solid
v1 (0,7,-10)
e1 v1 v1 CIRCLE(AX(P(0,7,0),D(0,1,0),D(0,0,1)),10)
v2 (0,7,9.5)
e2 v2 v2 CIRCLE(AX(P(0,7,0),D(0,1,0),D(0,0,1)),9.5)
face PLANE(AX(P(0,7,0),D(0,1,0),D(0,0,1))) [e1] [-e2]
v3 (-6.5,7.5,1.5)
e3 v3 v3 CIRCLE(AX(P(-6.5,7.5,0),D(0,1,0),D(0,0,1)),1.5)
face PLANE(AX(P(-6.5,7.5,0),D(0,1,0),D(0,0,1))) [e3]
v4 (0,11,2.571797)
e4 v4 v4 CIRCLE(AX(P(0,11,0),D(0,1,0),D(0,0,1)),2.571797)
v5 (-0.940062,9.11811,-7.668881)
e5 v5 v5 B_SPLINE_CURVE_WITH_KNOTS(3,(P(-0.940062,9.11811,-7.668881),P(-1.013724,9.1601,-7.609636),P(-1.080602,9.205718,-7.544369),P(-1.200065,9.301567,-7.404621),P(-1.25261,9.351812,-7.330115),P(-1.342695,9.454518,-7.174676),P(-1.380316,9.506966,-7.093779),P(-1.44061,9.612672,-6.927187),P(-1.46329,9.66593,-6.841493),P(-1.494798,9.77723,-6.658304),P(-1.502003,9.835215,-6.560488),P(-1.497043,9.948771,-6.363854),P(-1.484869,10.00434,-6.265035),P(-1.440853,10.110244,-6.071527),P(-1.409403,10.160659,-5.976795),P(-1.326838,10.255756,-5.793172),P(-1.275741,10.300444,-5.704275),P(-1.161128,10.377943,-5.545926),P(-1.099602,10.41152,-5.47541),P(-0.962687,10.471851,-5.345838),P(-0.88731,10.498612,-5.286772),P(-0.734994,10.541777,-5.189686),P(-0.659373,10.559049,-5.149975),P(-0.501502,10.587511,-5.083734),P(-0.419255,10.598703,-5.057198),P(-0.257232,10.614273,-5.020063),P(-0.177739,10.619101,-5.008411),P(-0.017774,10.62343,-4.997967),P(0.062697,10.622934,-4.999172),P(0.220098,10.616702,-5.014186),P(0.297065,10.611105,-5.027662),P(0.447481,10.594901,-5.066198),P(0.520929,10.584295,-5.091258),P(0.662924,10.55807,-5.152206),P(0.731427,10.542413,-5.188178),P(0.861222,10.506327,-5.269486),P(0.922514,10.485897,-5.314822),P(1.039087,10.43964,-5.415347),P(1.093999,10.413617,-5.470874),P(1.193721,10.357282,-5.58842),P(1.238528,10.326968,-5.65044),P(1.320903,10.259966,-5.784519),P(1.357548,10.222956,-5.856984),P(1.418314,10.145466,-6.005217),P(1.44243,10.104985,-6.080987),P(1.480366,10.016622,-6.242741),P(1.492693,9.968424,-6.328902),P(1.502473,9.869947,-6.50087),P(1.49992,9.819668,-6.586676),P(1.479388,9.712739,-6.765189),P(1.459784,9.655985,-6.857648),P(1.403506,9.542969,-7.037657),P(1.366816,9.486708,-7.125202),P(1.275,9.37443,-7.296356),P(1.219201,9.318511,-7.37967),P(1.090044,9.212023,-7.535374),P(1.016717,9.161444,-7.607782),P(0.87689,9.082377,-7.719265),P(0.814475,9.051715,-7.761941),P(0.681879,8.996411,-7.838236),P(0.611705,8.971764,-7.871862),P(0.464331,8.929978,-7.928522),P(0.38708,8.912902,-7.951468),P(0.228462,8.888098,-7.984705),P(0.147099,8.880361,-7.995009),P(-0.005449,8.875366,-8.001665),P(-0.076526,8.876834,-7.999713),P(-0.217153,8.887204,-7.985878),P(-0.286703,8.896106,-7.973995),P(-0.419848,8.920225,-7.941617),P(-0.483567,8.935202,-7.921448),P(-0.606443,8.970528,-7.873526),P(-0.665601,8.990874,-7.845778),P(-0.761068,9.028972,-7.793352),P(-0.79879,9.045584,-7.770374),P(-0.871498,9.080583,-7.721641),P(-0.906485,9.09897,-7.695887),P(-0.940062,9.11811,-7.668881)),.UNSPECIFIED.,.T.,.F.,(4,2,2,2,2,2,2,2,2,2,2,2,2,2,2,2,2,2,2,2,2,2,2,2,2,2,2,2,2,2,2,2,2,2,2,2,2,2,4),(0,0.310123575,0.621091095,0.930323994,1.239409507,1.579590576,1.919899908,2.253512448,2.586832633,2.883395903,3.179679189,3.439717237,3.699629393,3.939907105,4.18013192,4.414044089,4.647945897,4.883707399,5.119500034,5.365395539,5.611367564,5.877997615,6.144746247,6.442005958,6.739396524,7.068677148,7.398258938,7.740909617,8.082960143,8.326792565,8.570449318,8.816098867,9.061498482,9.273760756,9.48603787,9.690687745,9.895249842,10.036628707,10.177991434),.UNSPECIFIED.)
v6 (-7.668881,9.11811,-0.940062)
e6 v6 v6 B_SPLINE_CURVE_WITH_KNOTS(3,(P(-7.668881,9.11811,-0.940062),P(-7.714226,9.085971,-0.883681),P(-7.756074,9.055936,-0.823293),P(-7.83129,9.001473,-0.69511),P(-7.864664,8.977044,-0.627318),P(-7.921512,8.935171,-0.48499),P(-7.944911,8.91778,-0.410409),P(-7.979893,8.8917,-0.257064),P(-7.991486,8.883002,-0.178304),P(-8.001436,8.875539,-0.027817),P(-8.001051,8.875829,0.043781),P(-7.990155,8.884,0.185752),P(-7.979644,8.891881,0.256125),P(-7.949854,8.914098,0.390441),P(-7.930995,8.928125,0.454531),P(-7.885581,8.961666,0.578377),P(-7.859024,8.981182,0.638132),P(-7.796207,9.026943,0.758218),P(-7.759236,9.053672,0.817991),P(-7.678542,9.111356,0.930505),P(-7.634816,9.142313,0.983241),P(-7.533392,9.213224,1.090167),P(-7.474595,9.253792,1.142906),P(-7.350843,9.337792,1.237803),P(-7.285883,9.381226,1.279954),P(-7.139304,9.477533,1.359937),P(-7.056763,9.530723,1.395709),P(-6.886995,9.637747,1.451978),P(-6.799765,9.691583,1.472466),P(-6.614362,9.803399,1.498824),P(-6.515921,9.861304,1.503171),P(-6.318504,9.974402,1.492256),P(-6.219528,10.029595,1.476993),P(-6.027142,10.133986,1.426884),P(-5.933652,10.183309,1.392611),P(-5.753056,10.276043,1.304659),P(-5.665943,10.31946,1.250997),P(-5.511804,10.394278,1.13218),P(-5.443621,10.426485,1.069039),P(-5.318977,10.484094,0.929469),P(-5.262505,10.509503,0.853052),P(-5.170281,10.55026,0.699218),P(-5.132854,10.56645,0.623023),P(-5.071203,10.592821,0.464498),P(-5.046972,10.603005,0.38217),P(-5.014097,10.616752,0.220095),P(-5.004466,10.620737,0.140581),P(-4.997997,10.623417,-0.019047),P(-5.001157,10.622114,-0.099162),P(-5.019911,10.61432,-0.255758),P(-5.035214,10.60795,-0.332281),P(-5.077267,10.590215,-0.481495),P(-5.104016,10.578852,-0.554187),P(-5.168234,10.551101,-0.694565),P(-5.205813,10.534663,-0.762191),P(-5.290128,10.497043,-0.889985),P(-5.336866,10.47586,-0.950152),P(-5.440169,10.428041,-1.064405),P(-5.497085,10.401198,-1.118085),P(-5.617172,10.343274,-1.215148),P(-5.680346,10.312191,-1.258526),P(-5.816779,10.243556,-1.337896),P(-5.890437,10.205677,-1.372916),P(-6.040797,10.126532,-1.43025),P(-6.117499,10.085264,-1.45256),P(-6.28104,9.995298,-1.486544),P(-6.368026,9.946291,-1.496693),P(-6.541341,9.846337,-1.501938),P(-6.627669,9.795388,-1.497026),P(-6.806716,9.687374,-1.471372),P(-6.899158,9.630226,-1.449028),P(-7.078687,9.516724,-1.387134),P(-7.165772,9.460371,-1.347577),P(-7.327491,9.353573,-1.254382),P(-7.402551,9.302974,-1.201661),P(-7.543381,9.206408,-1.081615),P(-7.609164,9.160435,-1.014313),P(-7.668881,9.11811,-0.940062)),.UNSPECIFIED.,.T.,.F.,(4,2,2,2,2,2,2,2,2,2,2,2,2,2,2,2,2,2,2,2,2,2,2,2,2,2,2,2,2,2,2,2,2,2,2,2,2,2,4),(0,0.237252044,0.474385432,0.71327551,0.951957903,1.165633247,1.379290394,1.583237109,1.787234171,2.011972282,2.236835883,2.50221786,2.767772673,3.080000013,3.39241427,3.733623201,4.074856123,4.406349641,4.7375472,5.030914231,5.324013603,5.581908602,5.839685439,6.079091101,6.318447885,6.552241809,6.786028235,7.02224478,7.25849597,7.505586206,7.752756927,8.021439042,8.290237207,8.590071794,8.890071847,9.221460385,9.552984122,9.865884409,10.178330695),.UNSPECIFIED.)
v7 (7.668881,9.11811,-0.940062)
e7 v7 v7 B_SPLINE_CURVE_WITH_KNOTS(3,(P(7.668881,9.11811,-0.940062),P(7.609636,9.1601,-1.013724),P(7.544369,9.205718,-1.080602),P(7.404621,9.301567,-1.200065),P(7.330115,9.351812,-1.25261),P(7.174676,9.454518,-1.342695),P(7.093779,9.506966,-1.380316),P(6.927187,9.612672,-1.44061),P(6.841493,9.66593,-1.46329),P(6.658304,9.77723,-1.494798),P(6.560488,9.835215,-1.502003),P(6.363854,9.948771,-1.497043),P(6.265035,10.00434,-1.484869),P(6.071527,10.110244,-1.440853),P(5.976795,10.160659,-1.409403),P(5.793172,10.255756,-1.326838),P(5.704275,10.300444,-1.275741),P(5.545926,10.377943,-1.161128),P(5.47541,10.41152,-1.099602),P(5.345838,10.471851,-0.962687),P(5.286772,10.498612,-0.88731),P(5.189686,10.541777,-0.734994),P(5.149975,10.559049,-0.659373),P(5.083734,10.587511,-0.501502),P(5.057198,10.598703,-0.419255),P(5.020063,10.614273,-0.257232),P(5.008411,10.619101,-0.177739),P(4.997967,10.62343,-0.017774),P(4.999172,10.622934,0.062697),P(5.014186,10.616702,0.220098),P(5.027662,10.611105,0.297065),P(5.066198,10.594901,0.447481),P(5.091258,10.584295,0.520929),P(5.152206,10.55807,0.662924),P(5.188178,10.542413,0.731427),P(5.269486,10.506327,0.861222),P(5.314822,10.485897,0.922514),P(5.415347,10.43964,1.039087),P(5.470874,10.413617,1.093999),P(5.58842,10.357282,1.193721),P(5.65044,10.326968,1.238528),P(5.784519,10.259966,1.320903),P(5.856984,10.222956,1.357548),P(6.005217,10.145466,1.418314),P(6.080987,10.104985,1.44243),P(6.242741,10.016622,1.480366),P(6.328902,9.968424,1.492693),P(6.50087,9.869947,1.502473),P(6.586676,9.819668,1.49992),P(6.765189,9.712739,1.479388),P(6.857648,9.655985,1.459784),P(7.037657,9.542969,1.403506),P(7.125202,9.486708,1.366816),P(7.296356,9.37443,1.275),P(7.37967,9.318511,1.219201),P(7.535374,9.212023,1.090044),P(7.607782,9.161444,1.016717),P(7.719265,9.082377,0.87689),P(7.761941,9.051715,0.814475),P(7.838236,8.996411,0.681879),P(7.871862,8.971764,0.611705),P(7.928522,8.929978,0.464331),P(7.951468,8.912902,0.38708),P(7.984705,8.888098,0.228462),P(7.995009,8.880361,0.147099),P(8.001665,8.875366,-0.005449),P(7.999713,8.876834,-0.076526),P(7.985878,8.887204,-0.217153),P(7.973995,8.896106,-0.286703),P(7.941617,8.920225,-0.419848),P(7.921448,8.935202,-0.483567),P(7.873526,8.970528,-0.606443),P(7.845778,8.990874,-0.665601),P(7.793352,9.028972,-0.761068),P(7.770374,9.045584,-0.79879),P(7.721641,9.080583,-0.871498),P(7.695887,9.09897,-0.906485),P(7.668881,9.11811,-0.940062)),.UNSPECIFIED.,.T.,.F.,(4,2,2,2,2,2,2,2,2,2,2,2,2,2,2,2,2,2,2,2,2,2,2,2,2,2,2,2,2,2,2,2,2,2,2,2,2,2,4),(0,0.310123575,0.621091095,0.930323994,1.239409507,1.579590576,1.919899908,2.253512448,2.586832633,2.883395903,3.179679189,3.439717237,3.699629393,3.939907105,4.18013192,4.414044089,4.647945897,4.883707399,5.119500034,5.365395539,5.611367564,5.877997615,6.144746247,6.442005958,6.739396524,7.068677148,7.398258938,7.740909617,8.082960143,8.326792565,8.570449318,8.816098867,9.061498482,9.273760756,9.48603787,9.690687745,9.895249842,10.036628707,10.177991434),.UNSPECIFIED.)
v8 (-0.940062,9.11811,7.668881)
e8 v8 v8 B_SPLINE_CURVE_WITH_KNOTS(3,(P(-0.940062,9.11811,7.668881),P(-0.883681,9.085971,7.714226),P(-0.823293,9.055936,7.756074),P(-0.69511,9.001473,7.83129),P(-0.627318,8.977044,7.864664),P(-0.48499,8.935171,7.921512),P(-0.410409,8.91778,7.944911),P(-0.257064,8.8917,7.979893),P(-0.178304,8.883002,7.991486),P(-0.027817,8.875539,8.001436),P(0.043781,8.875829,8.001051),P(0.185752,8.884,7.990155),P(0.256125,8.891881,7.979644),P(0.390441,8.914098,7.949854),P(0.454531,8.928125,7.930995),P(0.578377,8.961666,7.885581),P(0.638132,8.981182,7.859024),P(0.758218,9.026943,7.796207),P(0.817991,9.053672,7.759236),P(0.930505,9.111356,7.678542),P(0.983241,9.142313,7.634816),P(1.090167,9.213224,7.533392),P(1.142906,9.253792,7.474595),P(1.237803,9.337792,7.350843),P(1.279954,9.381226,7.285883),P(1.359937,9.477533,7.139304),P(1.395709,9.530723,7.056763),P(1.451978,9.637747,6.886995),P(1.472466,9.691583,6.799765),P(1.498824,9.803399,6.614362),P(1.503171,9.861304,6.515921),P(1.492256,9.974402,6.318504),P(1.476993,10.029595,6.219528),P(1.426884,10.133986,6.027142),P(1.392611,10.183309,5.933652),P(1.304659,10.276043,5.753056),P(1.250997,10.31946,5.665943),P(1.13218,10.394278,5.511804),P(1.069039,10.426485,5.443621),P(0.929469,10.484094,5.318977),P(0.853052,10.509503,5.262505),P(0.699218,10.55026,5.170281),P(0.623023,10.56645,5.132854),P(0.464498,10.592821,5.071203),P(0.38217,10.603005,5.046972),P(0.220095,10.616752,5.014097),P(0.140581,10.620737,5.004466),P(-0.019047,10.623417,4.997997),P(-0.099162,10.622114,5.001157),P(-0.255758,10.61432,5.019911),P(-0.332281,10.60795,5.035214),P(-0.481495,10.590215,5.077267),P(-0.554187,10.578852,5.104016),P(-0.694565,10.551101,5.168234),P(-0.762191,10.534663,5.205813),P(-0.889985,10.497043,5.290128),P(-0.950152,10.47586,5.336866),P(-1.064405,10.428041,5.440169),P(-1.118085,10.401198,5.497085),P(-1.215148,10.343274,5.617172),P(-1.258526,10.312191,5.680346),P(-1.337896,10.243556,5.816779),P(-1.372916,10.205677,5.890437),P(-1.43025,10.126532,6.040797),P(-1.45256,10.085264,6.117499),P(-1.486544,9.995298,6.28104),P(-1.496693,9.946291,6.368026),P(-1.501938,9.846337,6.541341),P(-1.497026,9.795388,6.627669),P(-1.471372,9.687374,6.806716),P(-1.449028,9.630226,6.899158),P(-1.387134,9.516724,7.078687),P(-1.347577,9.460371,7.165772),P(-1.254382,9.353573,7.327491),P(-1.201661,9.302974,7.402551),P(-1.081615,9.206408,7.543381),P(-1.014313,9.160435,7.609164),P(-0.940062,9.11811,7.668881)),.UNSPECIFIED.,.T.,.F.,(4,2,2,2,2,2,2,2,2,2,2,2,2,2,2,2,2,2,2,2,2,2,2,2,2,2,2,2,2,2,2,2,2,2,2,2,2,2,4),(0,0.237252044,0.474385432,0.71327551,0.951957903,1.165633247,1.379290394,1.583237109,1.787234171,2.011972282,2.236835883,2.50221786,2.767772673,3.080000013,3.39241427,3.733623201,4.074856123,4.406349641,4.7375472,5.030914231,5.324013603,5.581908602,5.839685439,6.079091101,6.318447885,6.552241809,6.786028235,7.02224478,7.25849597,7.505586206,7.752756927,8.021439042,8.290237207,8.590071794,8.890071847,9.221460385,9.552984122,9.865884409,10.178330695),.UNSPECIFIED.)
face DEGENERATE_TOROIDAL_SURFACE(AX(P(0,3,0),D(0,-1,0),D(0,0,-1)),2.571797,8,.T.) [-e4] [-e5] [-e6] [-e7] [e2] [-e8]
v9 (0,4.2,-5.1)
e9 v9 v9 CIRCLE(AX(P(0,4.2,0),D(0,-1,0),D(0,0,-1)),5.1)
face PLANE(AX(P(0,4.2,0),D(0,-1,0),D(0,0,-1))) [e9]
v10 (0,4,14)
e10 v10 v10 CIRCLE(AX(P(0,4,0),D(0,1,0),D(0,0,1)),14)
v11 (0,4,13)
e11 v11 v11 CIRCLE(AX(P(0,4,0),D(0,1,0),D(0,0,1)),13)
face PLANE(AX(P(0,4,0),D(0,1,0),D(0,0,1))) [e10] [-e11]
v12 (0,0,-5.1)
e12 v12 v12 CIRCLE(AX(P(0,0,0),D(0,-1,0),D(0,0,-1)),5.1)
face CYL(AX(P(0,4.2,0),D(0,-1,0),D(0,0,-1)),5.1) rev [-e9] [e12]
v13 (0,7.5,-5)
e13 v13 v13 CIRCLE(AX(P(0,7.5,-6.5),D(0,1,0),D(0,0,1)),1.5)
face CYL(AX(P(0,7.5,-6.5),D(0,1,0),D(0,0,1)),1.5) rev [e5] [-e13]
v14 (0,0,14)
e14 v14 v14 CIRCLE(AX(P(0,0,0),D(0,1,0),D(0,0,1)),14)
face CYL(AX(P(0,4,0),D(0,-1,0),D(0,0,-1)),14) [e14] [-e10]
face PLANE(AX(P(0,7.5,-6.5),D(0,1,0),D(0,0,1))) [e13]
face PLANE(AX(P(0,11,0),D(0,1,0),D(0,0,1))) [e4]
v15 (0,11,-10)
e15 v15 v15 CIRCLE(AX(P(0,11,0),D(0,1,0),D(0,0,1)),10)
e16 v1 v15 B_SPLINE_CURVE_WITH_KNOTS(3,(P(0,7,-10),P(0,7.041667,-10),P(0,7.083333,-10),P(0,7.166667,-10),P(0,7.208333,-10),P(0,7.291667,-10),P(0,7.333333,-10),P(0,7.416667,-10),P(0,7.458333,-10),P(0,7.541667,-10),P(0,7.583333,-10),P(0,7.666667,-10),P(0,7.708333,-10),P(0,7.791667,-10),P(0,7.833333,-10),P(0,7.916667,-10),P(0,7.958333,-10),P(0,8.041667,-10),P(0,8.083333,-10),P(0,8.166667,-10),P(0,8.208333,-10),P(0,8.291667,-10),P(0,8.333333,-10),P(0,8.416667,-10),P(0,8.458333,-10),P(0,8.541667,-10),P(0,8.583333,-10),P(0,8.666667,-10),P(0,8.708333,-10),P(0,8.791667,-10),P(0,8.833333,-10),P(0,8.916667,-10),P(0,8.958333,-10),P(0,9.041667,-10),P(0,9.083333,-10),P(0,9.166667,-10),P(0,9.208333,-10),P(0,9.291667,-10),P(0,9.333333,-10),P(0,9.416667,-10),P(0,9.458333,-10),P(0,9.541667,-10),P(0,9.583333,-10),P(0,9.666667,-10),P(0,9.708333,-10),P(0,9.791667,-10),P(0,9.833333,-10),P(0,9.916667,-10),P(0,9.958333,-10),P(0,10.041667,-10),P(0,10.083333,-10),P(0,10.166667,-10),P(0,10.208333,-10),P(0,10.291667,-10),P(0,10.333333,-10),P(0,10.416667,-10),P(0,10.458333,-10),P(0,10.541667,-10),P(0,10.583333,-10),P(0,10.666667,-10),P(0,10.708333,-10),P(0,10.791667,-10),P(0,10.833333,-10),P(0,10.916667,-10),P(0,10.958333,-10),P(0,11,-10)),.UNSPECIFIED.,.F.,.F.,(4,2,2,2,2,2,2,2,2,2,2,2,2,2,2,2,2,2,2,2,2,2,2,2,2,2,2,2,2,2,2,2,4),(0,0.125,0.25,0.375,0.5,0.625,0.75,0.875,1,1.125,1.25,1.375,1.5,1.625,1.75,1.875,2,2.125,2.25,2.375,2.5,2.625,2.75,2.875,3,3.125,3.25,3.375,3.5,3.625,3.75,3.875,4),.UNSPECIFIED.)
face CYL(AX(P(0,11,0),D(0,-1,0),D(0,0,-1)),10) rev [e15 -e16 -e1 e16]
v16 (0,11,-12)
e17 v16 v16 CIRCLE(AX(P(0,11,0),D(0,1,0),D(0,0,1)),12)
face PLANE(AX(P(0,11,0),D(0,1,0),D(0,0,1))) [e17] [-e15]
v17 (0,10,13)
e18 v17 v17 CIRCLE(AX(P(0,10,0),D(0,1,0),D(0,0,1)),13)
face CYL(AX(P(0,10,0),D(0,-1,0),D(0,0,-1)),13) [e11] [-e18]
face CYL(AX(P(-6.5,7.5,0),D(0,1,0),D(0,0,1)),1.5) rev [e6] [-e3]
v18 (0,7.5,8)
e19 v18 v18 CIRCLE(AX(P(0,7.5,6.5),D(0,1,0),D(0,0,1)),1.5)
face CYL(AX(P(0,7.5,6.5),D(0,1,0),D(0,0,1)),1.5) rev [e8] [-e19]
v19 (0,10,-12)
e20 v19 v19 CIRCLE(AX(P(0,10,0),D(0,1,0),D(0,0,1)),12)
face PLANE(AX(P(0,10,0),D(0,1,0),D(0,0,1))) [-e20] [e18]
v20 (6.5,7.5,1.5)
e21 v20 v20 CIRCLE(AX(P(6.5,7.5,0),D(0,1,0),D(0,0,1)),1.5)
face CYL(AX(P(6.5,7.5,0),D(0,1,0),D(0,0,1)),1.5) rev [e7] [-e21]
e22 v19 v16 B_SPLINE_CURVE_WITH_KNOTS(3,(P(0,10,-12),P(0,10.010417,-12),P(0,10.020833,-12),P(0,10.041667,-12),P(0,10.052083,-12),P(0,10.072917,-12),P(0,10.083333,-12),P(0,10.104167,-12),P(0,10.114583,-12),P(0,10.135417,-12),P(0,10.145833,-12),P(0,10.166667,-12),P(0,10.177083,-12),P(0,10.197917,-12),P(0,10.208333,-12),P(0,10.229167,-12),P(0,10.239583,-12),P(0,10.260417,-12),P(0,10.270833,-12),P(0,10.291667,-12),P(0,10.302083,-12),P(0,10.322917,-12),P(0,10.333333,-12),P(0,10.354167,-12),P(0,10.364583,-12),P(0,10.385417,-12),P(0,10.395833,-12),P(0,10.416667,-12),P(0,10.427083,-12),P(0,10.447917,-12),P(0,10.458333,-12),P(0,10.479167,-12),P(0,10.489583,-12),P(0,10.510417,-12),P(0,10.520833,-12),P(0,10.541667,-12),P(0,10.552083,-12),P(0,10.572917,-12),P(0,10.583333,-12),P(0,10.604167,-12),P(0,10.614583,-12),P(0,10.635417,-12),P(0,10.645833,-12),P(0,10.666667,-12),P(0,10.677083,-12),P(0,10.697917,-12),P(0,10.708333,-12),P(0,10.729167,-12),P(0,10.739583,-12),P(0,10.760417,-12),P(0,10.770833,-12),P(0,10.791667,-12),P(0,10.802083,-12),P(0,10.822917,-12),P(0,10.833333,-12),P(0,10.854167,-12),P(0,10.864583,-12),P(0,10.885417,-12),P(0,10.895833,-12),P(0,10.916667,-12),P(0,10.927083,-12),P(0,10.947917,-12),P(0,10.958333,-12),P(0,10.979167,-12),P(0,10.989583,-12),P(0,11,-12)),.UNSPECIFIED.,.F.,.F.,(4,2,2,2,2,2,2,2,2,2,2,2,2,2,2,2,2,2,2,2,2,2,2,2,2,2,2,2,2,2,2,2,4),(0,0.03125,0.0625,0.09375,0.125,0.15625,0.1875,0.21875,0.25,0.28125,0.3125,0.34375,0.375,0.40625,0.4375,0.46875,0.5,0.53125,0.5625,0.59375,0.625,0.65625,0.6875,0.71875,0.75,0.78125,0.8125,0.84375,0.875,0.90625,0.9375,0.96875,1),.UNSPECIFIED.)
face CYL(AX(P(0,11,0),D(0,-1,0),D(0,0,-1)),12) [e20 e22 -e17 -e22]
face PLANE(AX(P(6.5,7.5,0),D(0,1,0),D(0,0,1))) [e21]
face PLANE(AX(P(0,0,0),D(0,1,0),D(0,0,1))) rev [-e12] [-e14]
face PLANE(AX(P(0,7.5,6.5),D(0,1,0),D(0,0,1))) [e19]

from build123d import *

# Parameters (mm, degrees)
SKETCH1_R           = 14
BOSS_EXTRUDE1_DEPTH = 4
SKETCH2_R           = 13
SKETCH2_R_2         = 12
BOSS_EXTRUDE2_DEPTH = 6
SKETCH2_3_R         = 12
SKETCH2_3_R_2       = 10
BOSS_EXTRUDE3_DEPTH = 7
SKETCH2_4_R         = 10
BOSS_EXTRUDE4_DEPTH = 3
SKETCH3_R           = 9.5
BOSS_EXTRUDE5_DEPTH = 4
FILLET1_R           = 8
SKETCH5_R           = 1.5
CUT_EXTRUDE1_DEPTH  = 3.5
SKETCH6_R           = 5.1
CUT_EXTRUDE2_DEPTH  = 4.2


with BuildPart() as part:
    # Sketch1 → Boss-Extrude1 (new body)
    with BuildSketch(Plane(origin=(0, 0, 0), x_dir=(1, 0, 0), z_dir=(0, 1, 0))):
        with Locations(Location((0, 0, 0), (0, 0, 270))):
            Circle(SKETCH1_R)
    extrude(amount=BOSS_EXTRUDE1_DEPTH)

    # Sketch2 → Boss-Extrude2 (add)
    with BuildSketch(Plane(origin=(0, 4, 0), x_dir=(1, 0, 0), z_dir=(0, 1, 0))):
        with Locations(Location((0, 0, 0), (0, 0, 270))):
            Circle(SKETCH2_R)
        with Locations(Location((0, 0, 0), (0, 0, 270))):
            Circle(SKETCH2_R_2, mode=Mode.SUBTRACT)
    extrude(amount=BOSS_EXTRUDE2_DEPTH)

    # Sketch2<3> → Boss-Extrude3 (add)
    with BuildSketch(Plane(origin=(0, 4, 0), x_dir=(1, 0, 0), z_dir=(0, 1, 0))):
        with Locations(Location((0, 0, 0), (0, 0, 90))):
            Circle(SKETCH2_3_R)
        with Locations(Location((0, 0, 0), (0, 0, 90))):
            Circle(SKETCH2_3_R_2, mode=Mode.SUBTRACT)
    extrude(amount=BOSS_EXTRUDE3_DEPTH)

    # Sketch2<4> → Boss-Extrude4 (add)
    with BuildSketch(Plane(origin=(0, 4, 0), x_dir=(1, 0, 0), z_dir=(0, 1, 0))):
        with Locations(Location((0, 0, 0), (0, 0, 90))):
            Circle(SKETCH2_4_R)
    extrude(amount=BOSS_EXTRUDE4_DEPTH)

    # Sketch3 → Boss-Extrude5 (add)
    with BuildSketch(Plane(origin=(0, 7, 0), x_dir=(1, 0, 0), z_dir=(0, 1, 0))):
        with Locations(Location((0, 0, 0), (0, 0, 270))):
            Circle(SKETCH3_R)
    extrude(amount=BOSS_EXTRUDE5_DEPTH)

    # Fillet1
    # the kernel refuses this fillet: 8 mm, written as the material it takes off along each edge
    with BuildSketch(Plane(origin=(0, 11, 0), x_dir=(0, 0, 1), z_dir=(-1, 0, 0))) as fillet1_piece_1:
        with BuildLine():
            CenterArc((2.57179677, -8), FILLET1_R, 30, 60)
            Line((2.57179677, 0), (2.57179677, 0.16))
            Line((2.57179677, 0.16), (9.5, 0.16))
            Line((9.5, 0.16), (9.66, 0))
            ThreePointArc((9.66, 0), (9.66, -2), (9.638564065, -3.92))
            Line((9.638564065, -3.92), (9.5, -4))
        make_face()
    revolve(axis=Axis((0, 11, 0), (0, 1, 0)), mode=Mode.SUBTRACT)

    # Sketch5 → Cut-Extrude1 (cut)
    with BuildSketch(Plane(origin=(0, 11, 0), x_dir=(1, 0, 0), z_dir=(0, 1, 0))):
        with Locations(Location((0, 6.5, 0), (0, 0, 270))):
            Circle(SKETCH5_R)
        with Locations(Location((6.5, 0, 0), (0, 0, 270))):
            Circle(SKETCH5_R)
        with Locations(Location((0, -6.5, 0), (0, 0, 270))):
            Circle(SKETCH5_R)
        with Locations(Location((-6.5, 0, 0), (0, 0, 270))):
            Circle(SKETCH5_R)
    extrude(amount=-CUT_EXTRUDE1_DEPTH, mode=Mode.SUBTRACT)

    # Sketch6 → Cut-Extrude2 (cut)
    with BuildSketch(Plane.XZ):
        with Locations(Location((0, 0, 0), (0, 0, 270))):
            Circle(SKETCH6_R)
    extrude(amount=-CUT_EXTRUDE2_DEPTH, mode=Mode.SUBTRACT)


solid = part.part
